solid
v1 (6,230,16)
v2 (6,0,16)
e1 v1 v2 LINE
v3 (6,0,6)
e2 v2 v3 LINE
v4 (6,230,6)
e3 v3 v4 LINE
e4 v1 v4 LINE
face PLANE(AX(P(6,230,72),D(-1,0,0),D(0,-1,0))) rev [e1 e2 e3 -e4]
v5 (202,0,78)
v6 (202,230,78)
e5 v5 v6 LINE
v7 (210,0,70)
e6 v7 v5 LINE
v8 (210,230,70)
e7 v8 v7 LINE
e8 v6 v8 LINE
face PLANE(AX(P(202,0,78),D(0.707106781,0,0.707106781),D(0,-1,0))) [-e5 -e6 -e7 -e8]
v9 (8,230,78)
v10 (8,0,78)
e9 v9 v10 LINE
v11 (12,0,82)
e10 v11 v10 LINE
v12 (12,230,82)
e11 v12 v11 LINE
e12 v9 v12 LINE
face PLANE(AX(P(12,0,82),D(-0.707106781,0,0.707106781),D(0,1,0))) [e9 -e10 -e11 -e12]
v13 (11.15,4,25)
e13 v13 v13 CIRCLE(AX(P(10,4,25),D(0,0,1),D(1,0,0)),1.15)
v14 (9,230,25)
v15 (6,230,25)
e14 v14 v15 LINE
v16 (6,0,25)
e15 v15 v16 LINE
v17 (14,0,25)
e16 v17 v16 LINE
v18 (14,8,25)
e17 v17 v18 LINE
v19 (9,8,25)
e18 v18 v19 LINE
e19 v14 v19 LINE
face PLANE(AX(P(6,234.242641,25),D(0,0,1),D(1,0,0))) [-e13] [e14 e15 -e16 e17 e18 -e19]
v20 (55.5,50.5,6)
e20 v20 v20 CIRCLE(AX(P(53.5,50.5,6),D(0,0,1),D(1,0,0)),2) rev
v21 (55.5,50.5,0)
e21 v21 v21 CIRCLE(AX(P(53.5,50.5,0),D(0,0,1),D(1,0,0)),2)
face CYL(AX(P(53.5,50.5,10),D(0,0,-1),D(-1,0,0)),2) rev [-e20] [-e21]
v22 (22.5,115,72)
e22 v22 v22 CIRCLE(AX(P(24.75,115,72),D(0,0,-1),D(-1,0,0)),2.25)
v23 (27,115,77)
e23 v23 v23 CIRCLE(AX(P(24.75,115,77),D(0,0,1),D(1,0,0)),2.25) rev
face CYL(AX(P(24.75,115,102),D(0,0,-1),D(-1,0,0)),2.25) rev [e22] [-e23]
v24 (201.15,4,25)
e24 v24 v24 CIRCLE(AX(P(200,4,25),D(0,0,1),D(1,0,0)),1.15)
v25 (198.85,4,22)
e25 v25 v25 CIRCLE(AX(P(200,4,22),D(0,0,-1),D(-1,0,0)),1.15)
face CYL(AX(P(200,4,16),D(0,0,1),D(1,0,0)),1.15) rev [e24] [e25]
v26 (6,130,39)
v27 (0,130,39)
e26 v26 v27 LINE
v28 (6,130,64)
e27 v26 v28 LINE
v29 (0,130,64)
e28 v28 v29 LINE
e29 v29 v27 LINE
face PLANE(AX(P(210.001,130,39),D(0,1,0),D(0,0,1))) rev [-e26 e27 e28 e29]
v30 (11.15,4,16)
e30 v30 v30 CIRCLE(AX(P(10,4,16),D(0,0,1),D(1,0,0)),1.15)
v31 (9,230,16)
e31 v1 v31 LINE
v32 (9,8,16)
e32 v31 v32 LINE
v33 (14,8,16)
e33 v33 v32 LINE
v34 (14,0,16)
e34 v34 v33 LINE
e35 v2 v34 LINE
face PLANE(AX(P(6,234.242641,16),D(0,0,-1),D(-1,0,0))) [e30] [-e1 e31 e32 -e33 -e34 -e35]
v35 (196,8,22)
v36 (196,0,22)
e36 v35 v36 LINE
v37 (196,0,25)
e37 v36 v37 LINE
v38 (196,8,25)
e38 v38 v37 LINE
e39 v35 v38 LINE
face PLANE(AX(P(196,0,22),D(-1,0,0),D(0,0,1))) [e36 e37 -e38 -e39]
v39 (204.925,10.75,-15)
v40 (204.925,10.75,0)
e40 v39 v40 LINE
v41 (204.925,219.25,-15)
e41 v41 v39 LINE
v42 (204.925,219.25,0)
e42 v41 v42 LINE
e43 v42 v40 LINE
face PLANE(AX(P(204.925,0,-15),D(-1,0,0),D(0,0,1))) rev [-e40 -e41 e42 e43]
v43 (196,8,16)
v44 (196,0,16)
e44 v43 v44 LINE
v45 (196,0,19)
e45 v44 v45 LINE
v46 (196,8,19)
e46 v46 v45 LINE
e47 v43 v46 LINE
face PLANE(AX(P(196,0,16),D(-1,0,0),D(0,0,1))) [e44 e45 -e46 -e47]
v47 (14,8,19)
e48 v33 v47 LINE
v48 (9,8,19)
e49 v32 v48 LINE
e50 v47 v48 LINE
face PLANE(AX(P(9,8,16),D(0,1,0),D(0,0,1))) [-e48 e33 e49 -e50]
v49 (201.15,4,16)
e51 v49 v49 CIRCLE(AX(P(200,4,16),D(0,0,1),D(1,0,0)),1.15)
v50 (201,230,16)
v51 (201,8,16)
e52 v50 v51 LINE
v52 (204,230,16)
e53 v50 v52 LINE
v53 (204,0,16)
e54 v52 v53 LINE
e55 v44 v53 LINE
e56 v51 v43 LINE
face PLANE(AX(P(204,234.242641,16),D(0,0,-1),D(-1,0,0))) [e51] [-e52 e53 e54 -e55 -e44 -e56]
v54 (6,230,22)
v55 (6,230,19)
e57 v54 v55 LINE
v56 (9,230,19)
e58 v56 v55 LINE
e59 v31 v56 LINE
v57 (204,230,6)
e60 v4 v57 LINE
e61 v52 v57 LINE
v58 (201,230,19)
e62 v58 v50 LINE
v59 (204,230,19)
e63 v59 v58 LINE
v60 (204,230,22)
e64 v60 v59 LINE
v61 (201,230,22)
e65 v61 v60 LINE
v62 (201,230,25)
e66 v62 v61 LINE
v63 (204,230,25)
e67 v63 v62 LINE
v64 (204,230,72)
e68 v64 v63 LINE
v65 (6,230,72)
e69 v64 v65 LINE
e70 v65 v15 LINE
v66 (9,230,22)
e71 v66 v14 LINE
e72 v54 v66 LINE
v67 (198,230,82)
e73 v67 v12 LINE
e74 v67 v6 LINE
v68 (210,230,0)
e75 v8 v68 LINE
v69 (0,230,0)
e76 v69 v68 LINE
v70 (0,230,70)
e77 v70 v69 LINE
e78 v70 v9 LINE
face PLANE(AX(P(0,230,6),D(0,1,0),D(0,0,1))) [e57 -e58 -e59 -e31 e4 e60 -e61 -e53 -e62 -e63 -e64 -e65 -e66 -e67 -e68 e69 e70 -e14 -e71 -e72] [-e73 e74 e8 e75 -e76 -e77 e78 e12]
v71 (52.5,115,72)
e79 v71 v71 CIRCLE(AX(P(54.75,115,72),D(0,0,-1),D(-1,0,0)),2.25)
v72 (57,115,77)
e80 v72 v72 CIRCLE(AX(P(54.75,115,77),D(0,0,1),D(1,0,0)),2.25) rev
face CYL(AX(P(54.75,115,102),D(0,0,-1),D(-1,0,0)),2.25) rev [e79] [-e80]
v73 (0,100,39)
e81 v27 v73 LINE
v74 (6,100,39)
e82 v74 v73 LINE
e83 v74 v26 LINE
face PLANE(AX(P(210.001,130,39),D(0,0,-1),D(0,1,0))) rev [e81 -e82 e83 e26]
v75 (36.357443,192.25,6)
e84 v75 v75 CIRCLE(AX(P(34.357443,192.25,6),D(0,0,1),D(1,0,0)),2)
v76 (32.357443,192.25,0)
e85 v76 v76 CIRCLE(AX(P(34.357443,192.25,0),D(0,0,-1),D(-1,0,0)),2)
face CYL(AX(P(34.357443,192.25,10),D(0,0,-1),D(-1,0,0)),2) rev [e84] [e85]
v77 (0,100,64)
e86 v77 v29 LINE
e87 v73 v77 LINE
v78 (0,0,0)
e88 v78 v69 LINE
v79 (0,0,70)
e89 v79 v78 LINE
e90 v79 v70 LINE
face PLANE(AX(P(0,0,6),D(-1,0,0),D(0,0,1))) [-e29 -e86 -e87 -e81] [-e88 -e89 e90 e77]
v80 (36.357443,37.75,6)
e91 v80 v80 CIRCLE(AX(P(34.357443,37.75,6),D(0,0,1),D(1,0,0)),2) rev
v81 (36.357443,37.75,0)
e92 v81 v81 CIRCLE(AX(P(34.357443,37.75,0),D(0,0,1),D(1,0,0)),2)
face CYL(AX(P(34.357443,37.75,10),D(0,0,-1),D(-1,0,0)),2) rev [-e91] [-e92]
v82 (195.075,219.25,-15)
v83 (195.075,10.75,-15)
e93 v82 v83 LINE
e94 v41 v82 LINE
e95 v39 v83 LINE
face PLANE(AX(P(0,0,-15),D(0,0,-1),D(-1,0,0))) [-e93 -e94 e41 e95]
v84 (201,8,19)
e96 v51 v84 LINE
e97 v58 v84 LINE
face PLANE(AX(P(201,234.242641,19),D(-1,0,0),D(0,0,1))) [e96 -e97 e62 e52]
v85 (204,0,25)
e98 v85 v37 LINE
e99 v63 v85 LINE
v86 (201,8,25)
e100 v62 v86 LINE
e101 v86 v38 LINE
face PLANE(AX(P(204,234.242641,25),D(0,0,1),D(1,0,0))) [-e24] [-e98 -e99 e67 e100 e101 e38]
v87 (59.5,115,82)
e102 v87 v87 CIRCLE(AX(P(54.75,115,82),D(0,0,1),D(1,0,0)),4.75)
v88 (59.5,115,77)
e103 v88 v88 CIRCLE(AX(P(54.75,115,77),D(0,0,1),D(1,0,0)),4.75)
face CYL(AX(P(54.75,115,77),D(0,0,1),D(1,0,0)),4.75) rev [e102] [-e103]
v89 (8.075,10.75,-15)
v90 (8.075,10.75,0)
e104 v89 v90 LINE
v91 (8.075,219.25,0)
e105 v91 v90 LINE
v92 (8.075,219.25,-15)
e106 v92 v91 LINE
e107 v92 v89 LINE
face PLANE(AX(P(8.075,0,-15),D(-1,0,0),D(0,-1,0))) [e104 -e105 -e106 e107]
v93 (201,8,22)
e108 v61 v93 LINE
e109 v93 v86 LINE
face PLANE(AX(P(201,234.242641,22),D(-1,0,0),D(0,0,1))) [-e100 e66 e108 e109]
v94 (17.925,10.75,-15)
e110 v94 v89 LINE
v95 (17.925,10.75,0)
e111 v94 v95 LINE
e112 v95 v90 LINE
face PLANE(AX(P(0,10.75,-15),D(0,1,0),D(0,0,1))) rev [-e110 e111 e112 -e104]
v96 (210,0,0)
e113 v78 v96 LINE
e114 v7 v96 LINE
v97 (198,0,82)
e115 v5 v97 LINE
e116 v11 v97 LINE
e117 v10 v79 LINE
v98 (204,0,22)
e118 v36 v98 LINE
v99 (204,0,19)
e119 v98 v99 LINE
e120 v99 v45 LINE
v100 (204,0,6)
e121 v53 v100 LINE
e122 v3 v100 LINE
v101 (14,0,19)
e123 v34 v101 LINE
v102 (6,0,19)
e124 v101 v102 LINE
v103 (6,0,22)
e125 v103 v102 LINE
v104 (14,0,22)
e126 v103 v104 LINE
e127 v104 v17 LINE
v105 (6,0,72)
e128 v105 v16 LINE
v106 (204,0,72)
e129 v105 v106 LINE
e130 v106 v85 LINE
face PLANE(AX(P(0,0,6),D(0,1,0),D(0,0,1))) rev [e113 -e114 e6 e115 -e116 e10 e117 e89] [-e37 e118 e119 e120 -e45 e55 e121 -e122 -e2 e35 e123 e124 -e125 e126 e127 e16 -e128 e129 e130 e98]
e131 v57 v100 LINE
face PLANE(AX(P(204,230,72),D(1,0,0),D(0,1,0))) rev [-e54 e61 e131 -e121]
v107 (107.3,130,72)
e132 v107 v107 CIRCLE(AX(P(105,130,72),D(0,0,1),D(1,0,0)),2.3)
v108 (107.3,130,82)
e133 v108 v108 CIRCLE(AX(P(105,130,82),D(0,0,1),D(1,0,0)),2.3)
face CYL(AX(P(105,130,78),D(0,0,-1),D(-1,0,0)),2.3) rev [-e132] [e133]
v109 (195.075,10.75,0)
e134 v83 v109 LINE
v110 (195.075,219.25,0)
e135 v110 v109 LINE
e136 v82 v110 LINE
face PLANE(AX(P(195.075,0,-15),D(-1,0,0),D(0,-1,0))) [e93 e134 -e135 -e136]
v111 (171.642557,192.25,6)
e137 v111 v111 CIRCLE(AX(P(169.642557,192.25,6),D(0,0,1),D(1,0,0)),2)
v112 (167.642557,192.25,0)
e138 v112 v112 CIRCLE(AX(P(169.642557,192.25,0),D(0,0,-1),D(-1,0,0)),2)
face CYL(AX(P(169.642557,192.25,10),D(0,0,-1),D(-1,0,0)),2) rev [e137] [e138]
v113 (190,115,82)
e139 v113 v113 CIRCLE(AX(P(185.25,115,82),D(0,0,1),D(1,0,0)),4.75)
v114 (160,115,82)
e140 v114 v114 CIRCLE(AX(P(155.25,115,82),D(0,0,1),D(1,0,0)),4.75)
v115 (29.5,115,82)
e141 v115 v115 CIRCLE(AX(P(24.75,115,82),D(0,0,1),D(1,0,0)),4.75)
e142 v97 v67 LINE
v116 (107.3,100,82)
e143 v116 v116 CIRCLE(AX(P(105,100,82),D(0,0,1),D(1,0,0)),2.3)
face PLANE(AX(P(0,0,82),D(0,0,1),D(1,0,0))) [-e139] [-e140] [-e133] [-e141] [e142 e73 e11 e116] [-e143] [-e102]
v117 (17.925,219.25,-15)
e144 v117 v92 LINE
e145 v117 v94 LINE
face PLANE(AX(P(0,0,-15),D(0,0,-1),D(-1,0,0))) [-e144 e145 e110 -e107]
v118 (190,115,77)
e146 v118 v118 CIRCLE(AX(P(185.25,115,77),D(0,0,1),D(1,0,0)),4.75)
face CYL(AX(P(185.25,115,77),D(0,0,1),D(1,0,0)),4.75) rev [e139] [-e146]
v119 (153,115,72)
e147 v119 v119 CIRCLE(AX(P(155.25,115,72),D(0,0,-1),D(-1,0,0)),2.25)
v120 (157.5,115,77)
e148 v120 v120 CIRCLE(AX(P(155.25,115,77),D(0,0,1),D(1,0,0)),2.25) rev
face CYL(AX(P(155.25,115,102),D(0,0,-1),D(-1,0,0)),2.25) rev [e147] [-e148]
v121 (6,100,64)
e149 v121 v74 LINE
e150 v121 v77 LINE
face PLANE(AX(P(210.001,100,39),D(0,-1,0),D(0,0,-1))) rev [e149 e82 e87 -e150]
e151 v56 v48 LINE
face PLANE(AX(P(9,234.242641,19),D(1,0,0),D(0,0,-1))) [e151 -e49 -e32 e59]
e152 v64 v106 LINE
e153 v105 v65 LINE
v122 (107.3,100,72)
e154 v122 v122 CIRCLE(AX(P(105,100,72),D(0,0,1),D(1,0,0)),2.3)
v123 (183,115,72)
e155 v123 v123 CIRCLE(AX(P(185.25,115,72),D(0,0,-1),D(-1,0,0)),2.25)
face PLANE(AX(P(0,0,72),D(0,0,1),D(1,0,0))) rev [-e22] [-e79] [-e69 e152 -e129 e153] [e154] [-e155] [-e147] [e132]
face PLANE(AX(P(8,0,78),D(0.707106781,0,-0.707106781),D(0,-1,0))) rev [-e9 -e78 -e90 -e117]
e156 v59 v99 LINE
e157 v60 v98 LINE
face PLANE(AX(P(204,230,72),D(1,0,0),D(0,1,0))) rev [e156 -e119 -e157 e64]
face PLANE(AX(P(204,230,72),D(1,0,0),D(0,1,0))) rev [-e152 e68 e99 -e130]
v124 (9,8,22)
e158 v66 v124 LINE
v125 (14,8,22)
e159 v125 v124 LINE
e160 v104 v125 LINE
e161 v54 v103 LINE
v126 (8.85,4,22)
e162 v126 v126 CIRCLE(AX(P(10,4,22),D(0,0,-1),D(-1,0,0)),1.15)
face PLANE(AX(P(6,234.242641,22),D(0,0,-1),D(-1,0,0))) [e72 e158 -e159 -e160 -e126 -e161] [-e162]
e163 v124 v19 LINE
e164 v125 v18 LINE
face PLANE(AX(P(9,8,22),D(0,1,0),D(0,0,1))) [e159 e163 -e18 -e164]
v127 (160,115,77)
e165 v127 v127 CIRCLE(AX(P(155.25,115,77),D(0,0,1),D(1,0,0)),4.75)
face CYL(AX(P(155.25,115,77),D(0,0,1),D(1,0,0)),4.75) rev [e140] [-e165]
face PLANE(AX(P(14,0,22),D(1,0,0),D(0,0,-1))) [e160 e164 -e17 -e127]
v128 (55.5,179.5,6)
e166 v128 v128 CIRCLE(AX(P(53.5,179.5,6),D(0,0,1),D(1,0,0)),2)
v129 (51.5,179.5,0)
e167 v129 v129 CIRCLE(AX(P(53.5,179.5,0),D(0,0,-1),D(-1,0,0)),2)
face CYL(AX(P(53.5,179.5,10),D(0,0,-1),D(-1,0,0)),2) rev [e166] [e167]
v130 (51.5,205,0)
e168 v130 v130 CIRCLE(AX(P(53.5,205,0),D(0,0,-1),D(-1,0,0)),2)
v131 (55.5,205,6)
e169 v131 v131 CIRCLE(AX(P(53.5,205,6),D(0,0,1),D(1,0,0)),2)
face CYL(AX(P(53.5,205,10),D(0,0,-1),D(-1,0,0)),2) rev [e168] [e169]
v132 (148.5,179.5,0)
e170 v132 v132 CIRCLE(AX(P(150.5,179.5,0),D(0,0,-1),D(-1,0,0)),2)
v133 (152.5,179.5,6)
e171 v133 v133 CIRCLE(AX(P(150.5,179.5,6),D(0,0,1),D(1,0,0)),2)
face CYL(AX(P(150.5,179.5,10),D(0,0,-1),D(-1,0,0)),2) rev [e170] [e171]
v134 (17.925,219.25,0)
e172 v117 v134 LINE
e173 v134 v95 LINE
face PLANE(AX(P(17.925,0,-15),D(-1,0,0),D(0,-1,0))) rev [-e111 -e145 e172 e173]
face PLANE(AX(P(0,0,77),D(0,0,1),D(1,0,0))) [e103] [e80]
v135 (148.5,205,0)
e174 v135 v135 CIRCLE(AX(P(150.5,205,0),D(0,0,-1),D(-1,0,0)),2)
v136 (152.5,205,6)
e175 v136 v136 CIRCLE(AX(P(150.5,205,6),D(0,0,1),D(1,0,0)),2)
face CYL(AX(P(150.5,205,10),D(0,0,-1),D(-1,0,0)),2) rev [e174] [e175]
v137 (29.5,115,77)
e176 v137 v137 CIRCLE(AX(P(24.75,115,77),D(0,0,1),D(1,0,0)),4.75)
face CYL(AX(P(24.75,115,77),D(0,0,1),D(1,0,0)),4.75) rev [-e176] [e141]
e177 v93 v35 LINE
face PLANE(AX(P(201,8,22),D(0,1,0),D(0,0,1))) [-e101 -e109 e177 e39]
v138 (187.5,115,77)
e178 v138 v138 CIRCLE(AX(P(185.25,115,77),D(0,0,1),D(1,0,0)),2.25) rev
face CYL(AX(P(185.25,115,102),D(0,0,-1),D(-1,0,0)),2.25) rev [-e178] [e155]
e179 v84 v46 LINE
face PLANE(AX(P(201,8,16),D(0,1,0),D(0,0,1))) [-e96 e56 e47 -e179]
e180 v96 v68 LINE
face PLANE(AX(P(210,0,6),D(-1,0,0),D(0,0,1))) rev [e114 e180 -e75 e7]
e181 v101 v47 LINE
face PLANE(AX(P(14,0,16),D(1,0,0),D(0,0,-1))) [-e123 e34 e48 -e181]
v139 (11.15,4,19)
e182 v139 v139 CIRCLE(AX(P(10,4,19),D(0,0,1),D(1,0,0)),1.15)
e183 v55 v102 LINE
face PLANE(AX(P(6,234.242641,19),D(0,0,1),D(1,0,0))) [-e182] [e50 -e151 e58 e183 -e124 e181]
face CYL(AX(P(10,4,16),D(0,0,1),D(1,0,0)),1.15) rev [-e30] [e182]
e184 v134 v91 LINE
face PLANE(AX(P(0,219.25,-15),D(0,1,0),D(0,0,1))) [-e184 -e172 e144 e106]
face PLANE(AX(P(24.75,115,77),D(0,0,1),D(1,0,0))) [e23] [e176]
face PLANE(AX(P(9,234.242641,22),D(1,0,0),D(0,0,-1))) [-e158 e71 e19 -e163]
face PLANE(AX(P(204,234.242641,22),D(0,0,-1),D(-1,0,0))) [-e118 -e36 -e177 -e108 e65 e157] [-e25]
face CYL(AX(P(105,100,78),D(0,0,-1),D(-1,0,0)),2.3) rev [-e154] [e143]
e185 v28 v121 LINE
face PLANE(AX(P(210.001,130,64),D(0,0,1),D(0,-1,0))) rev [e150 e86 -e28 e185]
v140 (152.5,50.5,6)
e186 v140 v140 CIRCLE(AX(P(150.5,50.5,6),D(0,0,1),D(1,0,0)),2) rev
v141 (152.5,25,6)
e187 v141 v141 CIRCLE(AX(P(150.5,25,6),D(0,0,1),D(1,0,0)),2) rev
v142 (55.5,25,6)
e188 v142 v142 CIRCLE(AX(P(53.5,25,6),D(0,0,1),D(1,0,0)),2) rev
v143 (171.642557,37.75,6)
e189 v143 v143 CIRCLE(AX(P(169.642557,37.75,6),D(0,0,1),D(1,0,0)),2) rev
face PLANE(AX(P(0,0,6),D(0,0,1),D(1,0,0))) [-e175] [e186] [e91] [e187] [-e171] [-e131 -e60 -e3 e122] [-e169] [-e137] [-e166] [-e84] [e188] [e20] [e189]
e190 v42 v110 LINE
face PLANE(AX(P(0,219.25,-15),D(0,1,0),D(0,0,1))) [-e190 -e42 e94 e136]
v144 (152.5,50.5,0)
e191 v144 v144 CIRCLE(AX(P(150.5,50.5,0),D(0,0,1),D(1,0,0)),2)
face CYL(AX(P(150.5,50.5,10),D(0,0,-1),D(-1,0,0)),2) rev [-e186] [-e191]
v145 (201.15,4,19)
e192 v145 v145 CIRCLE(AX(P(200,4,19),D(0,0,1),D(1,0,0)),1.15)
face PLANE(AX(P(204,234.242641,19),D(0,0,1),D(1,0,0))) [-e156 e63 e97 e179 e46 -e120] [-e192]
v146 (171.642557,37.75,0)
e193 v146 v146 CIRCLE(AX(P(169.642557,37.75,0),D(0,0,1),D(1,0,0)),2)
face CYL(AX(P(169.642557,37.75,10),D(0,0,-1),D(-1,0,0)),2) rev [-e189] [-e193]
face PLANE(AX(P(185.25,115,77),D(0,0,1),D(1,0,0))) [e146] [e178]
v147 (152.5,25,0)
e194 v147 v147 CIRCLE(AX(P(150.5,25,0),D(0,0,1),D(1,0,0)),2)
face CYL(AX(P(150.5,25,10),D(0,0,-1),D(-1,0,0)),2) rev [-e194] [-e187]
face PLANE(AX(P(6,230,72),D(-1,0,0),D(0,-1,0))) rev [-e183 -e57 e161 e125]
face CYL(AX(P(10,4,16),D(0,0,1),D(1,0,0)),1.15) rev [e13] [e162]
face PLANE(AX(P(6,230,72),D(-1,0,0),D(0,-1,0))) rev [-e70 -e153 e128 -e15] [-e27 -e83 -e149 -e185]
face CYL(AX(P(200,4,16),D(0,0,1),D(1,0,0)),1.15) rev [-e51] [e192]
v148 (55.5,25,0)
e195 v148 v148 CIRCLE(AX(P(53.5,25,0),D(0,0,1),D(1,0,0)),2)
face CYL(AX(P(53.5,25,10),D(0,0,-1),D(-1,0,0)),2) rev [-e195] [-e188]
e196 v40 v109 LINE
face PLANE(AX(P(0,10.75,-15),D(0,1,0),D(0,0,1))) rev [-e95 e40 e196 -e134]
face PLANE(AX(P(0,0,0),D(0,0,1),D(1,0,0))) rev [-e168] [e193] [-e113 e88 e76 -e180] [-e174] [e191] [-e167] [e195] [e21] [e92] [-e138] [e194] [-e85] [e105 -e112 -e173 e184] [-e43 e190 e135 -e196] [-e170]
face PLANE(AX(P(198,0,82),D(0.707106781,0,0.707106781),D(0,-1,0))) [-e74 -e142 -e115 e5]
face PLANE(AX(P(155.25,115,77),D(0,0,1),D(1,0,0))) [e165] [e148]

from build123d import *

# Parameters (mm, degrees)
SKETCH_1_W           = 210
SKETCH_1_H           = 230
EXTRUDE_1_DEPTH      = 6
SKETCH_2_W           = 9.85
SKETCH_2_H           = 208.5
EXTRUDE_3_DEPTH      = 15
SKETCH_3_R           = 2
CUT_EXTRUDE_1_DEPTH  = 10
SKETCH_17_W          = 6
SKETCH_17_H          = 230
EXTRUDE_9_DEPTH      = 66
EXTRUDE_10_DEPTH     = 6
CHAMFER_3_SIZE       = 8
SKETCH_21_R          = 2.3
CUT_EXTRUDE_9_DEPTH  = 6
SKETCH_34_R          = 2.25
CUT_EXTRUDE_14_DEPTH = 30
SKETCH_36_R          = 2.25
CUT_EXTRUDE_15_DEPTH = 30
SKETCH_51_W          = 194
SKETCH_51_H          = 230
EXTRUDE_22_DEPTH     = 4
CHAMFER_6_SIZE       = 4
CUT_EXTRUDE_START    = -5
SKETCH_54_R          = 4.75
SKETCH_54_R_2        = 2.3
CUT_EXTRUDE_21_DEPTH = 5
CUT_EXTRUDE_23_REACH = 324.062
SKETCH_60_W          = 25
SKETCH_60_H          = 30
SKETCH_61_W          = 3
SKETCH_61_H          = 3
EXTRUDE_25_DEPTH     = 230
SKETCH_63_W          = 5
SKETCH_63_H          = 8
EXTRUDE_26_DEPTH     = 3
SKETCH_65_W          = 5
SKETCH_65_H          = 8
EXTRUDE_27_DEPTH     = 3
SKETCH_64_R          = 1.15
CUT_EXTRUDE_24_DEPTH = 9
SKETCH_66_W          = 5
SKETCH_66_H          = 8
EXTRUDE_28_DEPTH     = 3
SKETCH_67_W          = 5
SKETCH_67_H          = 8
EXTRUDE_29_DEPTH     = 3
SKETCH_68_R          = 1.15
CUT_EXTRUDE_25_DEPTH = 9


with BuildPart() as part:
    # 草图1 → 凸台-拉伸1 (new body)
    with BuildSketch(Plane.XY):
        with Locations((105, 115)):
            Rectangle(SKETCH_1_W, SKETCH_1_H)
    extrude(amount=EXTRUDE_1_DEPTH)

    # 草图2 → 凸台-拉伸3 (add)
    with BuildSketch(Plane(origin=(0, 0, 0), x_dir=(-1, 0, 0), z_dir=(0, 0, -1))):
        with Locations((-200, 115)):
            Rectangle(SKETCH_2_W, SKETCH_2_H)
        with Locations((-13, 115)):
            Rectangle(SKETCH_2_W, SKETCH_2_H)
    extrude(amount=EXTRUDE_3_DEPTH)

    # 草图3 → 切除-拉伸1 (cut)
    with BuildSketch(Plane(origin=(0, 0, 0), x_dir=(-1, 0, 0), z_dir=(0, 0, -1))):
        with Locations((-169.6425573, 192.25)):
            Circle(SKETCH_3_R)
        with Locations((-150.5, 205)):
            Circle(SKETCH_3_R)
        with Locations((-150.5, 179.5)):
            Circle(SKETCH_3_R)
        with Locations(Location((-150.5, 50.5, 0), (0, 0, 180))):
            Circle(SKETCH_3_R)
        with Locations(Location((-150.5, 25, 0), (0, 0, 180))):
            Circle(SKETCH_3_R)
        with Locations(Location((-169.6425573, 37.75, 0), (0, 0, 180))):
            Circle(SKETCH_3_R)
        with Locations((-34.3574427, 192.25)):
            Circle(SKETCH_3_R)
        with Locations((-53.5, 205)):
            Circle(SKETCH_3_R)
        with Locations((-53.5, 179.5)):
            Circle(SKETCH_3_R)
        with Locations(Location((-53.5, 50.5, 0), (0, 0, 180))):
            Circle(SKETCH_3_R)
        with Locations(Location((-53.5, 25, 0), (0, 0, 180))):
            Circle(SKETCH_3_R)
        with Locations(Location((-34.3574427, 37.75, 0), (0, 0, 180))):
            Circle(SKETCH_3_R)
    extrude(amount=-CUT_EXTRUDE_1_DEPTH, mode=Mode.SUBTRACT)

    # 草图17 → 凸台-拉伸9 (add)
    with BuildSketch(Plane.XY.offset(6)):
        with Locations((3, 115)):
            Rectangle(SKETCH_17_W, SKETCH_17_H)
        with Locations((207, 115)):
            Rectangle(SKETCH_17_W, SKETCH_17_H)
    extrude(amount=EXTRUDE_9_DEPTH)

    # 草图18 → 凸台-拉伸10 (add)
    with BuildSketch(Plane.XY.offset(72)):
        Polygon((210, 230), (204, 230), (6, 230), (0, 230), (0, 0), (6, 0), (204, 0), (210, 0), align=None)
    extrude(amount=EXTRUDE_10_DEPTH)

    # 倒角3
    chamfer_3_edges = [part.edges().sort_by_distance(p)[0] for p in [
        (210, 115, 78),
        (0, 115, 78),
    ]]
    chamfer(chamfer_3_edges, length=CHAMFER_3_SIZE)

    # 草图21 → 切除-拉伸9 (cut)
    with BuildSketch(Plane.XY.offset(72)):
        with Locations((105, 130)):
            Circle(SKETCH_21_R)
        with Locations((105, 100)):
            Circle(SKETCH_21_R)
    extrude(amount=CUT_EXTRUDE_9_DEPTH, mode=Mode.SUBTRACT)

    # 草图34 → 切除-拉伸14 (cut)
    with BuildSketch(Plane(origin=(0, 0, 72), x_dir=(-1, 0, 0), z_dir=(0, 0, -1))):
        with Locations((-185.25, 115)):
            Circle(SKETCH_34_R)
        with Locations((-155.25, 115)):
            Circle(SKETCH_34_R)
    extrude(amount=-CUT_EXTRUDE_14_DEPTH, mode=Mode.SUBTRACT)

    # 草图36 → 切除-拉伸15 (cut)
    with BuildSketch(Plane(origin=(0, 0, 72), x_dir=(-1, 0, 0), z_dir=(0, 0, -1))):
        with Locations((-54.75, 115)):
            Circle(SKETCH_36_R)
        with Locations((-24.75, 115)):
            Circle(SKETCH_36_R)
    extrude(amount=-CUT_EXTRUDE_15_DEPTH, mode=Mode.SUBTRACT)

    # 草图51 → 凸台-拉伸22 (add)
    with BuildSketch(Plane.XY.offset(78)):
        with Locations((105, 115)):
            Rectangle(SKETCH_51_W, SKETCH_51_H)
    extrude(amount=EXTRUDE_22_DEPTH)

    # 倒角6
    chamfer_6_edges = [part.edges().sort_by_distance(p)[0] for p in [
        (202, 115, 82),
        (8, 115, 82),
    ]]
    chamfer(chamfer_6_edges, length=CHAMFER_6_SIZE - 0.0001)  # a hair under: the kernel refuses the full size

    # 草图54 → 切除-拉伸21 (cut)
    with BuildSketch(Plane.XY.offset(82).offset(CUT_EXTRUDE_START)):
        with Locations((54.75, 115)):
            Circle(SKETCH_54_R)
        with Locations((105, 130)):
            Circle(SKETCH_54_R_2)
        with Locations((105, 100)):
            Circle(SKETCH_54_R_2)
        with Locations((24.75, 115)):
            Circle(SKETCH_54_R)
        with Locations((155.25, 115)):
            Circle(SKETCH_54_R)
        with Locations((185.25, 115)):
            Circle(SKETCH_54_R)
    extrude(amount=CUT_EXTRUDE_21_DEPTH, mode=Mode.SUBTRACT)

    # 草图60 → 切除-拉伸23 (cut, up to next)
    with BuildSketch(Plane.ZY, mode=Mode.PRIVATE) as cut_extrude_23_sk1:
        with Locations((51.5, 115)):
            Rectangle(SKETCH_60_W, SKETCH_60_H)
    cut_extrude_23_tool1 = extrude(cut_extrude_23_sk1.sketch, amount=-CUT_EXTRUDE_23_REACH, mode=Mode.PRIVATE) & part.part
    add(cut_extrude_23_tool1.solids().sort_by_distance((0, 115, 51.5))[0], mode=Mode.SUBTRACT)

    # 草图61 → 凸台-拉伸25 (add)
    with BuildSketch(Plane.XZ):
        with Locations((7.5, 23.5)):
            Rectangle(SKETCH_61_W, SKETCH_61_H)
        with Locations((7.5, 17.5)):
            Rectangle(SKETCH_61_W, SKETCH_61_H)
        with Locations((202.5, 17.5)):
            Rectangle(SKETCH_61_W, SKETCH_61_H)
        with Locations((202.5, 23.5)):
            Rectangle(SKETCH_61_W, SKETCH_61_H)
    extrude(amount=-EXTRUDE_25_DEPTH)

    # 草图63 → 凸台-拉伸26 (add)
    with BuildSketch(Plane.XY.offset(25)):
        with Locations((11.5, 4)):
            Rectangle(SKETCH_63_W, SKETCH_63_H)
    extrude(amount=-EXTRUDE_26_DEPTH)

    # 草图65 → 凸台-拉伸27 (add)
    with BuildSketch(Plane.XY.offset(19)):
        with Locations((11.5, 4)):
            Rectangle(SKETCH_65_W, SKETCH_65_H)
    extrude(amount=-EXTRUDE_27_DEPTH)

    # 草图64 → 切除-拉伸24 (cut)
    with BuildSketch(Plane.XY.offset(25)):
        with Locations((10, 4)):
            Circle(SKETCH_64_R)
    extrude(amount=-CUT_EXTRUDE_24_DEPTH, mode=Mode.SUBTRACT)

    # 草图66 → 凸台-拉伸28 (add)
    with BuildSketch(Plane.XY.offset(25)):
        with Locations((198.5, 4)):
            Rectangle(SKETCH_66_W, SKETCH_66_H)
    extrude(amount=-EXTRUDE_28_DEPTH)

    # 草图67 → 凸台-拉伸29 (add)
    with BuildSketch(Plane.XY.offset(19)):
        with Locations((198.5, 4)):
            Rectangle(SKETCH_67_W, SKETCH_67_H)
    extrude(amount=-EXTRUDE_29_DEPTH)

    # 草图68 → 切除-拉伸25 (cut)
    with BuildSketch(Plane.XY.offset(25)):
        with Locations((200, 4)):
            Circle(SKETCH_68_R)
    extrude(amount=-CUT_EXTRUDE_25_DEPTH, mode=Mode.SUBTRACT)


solid = part.part
